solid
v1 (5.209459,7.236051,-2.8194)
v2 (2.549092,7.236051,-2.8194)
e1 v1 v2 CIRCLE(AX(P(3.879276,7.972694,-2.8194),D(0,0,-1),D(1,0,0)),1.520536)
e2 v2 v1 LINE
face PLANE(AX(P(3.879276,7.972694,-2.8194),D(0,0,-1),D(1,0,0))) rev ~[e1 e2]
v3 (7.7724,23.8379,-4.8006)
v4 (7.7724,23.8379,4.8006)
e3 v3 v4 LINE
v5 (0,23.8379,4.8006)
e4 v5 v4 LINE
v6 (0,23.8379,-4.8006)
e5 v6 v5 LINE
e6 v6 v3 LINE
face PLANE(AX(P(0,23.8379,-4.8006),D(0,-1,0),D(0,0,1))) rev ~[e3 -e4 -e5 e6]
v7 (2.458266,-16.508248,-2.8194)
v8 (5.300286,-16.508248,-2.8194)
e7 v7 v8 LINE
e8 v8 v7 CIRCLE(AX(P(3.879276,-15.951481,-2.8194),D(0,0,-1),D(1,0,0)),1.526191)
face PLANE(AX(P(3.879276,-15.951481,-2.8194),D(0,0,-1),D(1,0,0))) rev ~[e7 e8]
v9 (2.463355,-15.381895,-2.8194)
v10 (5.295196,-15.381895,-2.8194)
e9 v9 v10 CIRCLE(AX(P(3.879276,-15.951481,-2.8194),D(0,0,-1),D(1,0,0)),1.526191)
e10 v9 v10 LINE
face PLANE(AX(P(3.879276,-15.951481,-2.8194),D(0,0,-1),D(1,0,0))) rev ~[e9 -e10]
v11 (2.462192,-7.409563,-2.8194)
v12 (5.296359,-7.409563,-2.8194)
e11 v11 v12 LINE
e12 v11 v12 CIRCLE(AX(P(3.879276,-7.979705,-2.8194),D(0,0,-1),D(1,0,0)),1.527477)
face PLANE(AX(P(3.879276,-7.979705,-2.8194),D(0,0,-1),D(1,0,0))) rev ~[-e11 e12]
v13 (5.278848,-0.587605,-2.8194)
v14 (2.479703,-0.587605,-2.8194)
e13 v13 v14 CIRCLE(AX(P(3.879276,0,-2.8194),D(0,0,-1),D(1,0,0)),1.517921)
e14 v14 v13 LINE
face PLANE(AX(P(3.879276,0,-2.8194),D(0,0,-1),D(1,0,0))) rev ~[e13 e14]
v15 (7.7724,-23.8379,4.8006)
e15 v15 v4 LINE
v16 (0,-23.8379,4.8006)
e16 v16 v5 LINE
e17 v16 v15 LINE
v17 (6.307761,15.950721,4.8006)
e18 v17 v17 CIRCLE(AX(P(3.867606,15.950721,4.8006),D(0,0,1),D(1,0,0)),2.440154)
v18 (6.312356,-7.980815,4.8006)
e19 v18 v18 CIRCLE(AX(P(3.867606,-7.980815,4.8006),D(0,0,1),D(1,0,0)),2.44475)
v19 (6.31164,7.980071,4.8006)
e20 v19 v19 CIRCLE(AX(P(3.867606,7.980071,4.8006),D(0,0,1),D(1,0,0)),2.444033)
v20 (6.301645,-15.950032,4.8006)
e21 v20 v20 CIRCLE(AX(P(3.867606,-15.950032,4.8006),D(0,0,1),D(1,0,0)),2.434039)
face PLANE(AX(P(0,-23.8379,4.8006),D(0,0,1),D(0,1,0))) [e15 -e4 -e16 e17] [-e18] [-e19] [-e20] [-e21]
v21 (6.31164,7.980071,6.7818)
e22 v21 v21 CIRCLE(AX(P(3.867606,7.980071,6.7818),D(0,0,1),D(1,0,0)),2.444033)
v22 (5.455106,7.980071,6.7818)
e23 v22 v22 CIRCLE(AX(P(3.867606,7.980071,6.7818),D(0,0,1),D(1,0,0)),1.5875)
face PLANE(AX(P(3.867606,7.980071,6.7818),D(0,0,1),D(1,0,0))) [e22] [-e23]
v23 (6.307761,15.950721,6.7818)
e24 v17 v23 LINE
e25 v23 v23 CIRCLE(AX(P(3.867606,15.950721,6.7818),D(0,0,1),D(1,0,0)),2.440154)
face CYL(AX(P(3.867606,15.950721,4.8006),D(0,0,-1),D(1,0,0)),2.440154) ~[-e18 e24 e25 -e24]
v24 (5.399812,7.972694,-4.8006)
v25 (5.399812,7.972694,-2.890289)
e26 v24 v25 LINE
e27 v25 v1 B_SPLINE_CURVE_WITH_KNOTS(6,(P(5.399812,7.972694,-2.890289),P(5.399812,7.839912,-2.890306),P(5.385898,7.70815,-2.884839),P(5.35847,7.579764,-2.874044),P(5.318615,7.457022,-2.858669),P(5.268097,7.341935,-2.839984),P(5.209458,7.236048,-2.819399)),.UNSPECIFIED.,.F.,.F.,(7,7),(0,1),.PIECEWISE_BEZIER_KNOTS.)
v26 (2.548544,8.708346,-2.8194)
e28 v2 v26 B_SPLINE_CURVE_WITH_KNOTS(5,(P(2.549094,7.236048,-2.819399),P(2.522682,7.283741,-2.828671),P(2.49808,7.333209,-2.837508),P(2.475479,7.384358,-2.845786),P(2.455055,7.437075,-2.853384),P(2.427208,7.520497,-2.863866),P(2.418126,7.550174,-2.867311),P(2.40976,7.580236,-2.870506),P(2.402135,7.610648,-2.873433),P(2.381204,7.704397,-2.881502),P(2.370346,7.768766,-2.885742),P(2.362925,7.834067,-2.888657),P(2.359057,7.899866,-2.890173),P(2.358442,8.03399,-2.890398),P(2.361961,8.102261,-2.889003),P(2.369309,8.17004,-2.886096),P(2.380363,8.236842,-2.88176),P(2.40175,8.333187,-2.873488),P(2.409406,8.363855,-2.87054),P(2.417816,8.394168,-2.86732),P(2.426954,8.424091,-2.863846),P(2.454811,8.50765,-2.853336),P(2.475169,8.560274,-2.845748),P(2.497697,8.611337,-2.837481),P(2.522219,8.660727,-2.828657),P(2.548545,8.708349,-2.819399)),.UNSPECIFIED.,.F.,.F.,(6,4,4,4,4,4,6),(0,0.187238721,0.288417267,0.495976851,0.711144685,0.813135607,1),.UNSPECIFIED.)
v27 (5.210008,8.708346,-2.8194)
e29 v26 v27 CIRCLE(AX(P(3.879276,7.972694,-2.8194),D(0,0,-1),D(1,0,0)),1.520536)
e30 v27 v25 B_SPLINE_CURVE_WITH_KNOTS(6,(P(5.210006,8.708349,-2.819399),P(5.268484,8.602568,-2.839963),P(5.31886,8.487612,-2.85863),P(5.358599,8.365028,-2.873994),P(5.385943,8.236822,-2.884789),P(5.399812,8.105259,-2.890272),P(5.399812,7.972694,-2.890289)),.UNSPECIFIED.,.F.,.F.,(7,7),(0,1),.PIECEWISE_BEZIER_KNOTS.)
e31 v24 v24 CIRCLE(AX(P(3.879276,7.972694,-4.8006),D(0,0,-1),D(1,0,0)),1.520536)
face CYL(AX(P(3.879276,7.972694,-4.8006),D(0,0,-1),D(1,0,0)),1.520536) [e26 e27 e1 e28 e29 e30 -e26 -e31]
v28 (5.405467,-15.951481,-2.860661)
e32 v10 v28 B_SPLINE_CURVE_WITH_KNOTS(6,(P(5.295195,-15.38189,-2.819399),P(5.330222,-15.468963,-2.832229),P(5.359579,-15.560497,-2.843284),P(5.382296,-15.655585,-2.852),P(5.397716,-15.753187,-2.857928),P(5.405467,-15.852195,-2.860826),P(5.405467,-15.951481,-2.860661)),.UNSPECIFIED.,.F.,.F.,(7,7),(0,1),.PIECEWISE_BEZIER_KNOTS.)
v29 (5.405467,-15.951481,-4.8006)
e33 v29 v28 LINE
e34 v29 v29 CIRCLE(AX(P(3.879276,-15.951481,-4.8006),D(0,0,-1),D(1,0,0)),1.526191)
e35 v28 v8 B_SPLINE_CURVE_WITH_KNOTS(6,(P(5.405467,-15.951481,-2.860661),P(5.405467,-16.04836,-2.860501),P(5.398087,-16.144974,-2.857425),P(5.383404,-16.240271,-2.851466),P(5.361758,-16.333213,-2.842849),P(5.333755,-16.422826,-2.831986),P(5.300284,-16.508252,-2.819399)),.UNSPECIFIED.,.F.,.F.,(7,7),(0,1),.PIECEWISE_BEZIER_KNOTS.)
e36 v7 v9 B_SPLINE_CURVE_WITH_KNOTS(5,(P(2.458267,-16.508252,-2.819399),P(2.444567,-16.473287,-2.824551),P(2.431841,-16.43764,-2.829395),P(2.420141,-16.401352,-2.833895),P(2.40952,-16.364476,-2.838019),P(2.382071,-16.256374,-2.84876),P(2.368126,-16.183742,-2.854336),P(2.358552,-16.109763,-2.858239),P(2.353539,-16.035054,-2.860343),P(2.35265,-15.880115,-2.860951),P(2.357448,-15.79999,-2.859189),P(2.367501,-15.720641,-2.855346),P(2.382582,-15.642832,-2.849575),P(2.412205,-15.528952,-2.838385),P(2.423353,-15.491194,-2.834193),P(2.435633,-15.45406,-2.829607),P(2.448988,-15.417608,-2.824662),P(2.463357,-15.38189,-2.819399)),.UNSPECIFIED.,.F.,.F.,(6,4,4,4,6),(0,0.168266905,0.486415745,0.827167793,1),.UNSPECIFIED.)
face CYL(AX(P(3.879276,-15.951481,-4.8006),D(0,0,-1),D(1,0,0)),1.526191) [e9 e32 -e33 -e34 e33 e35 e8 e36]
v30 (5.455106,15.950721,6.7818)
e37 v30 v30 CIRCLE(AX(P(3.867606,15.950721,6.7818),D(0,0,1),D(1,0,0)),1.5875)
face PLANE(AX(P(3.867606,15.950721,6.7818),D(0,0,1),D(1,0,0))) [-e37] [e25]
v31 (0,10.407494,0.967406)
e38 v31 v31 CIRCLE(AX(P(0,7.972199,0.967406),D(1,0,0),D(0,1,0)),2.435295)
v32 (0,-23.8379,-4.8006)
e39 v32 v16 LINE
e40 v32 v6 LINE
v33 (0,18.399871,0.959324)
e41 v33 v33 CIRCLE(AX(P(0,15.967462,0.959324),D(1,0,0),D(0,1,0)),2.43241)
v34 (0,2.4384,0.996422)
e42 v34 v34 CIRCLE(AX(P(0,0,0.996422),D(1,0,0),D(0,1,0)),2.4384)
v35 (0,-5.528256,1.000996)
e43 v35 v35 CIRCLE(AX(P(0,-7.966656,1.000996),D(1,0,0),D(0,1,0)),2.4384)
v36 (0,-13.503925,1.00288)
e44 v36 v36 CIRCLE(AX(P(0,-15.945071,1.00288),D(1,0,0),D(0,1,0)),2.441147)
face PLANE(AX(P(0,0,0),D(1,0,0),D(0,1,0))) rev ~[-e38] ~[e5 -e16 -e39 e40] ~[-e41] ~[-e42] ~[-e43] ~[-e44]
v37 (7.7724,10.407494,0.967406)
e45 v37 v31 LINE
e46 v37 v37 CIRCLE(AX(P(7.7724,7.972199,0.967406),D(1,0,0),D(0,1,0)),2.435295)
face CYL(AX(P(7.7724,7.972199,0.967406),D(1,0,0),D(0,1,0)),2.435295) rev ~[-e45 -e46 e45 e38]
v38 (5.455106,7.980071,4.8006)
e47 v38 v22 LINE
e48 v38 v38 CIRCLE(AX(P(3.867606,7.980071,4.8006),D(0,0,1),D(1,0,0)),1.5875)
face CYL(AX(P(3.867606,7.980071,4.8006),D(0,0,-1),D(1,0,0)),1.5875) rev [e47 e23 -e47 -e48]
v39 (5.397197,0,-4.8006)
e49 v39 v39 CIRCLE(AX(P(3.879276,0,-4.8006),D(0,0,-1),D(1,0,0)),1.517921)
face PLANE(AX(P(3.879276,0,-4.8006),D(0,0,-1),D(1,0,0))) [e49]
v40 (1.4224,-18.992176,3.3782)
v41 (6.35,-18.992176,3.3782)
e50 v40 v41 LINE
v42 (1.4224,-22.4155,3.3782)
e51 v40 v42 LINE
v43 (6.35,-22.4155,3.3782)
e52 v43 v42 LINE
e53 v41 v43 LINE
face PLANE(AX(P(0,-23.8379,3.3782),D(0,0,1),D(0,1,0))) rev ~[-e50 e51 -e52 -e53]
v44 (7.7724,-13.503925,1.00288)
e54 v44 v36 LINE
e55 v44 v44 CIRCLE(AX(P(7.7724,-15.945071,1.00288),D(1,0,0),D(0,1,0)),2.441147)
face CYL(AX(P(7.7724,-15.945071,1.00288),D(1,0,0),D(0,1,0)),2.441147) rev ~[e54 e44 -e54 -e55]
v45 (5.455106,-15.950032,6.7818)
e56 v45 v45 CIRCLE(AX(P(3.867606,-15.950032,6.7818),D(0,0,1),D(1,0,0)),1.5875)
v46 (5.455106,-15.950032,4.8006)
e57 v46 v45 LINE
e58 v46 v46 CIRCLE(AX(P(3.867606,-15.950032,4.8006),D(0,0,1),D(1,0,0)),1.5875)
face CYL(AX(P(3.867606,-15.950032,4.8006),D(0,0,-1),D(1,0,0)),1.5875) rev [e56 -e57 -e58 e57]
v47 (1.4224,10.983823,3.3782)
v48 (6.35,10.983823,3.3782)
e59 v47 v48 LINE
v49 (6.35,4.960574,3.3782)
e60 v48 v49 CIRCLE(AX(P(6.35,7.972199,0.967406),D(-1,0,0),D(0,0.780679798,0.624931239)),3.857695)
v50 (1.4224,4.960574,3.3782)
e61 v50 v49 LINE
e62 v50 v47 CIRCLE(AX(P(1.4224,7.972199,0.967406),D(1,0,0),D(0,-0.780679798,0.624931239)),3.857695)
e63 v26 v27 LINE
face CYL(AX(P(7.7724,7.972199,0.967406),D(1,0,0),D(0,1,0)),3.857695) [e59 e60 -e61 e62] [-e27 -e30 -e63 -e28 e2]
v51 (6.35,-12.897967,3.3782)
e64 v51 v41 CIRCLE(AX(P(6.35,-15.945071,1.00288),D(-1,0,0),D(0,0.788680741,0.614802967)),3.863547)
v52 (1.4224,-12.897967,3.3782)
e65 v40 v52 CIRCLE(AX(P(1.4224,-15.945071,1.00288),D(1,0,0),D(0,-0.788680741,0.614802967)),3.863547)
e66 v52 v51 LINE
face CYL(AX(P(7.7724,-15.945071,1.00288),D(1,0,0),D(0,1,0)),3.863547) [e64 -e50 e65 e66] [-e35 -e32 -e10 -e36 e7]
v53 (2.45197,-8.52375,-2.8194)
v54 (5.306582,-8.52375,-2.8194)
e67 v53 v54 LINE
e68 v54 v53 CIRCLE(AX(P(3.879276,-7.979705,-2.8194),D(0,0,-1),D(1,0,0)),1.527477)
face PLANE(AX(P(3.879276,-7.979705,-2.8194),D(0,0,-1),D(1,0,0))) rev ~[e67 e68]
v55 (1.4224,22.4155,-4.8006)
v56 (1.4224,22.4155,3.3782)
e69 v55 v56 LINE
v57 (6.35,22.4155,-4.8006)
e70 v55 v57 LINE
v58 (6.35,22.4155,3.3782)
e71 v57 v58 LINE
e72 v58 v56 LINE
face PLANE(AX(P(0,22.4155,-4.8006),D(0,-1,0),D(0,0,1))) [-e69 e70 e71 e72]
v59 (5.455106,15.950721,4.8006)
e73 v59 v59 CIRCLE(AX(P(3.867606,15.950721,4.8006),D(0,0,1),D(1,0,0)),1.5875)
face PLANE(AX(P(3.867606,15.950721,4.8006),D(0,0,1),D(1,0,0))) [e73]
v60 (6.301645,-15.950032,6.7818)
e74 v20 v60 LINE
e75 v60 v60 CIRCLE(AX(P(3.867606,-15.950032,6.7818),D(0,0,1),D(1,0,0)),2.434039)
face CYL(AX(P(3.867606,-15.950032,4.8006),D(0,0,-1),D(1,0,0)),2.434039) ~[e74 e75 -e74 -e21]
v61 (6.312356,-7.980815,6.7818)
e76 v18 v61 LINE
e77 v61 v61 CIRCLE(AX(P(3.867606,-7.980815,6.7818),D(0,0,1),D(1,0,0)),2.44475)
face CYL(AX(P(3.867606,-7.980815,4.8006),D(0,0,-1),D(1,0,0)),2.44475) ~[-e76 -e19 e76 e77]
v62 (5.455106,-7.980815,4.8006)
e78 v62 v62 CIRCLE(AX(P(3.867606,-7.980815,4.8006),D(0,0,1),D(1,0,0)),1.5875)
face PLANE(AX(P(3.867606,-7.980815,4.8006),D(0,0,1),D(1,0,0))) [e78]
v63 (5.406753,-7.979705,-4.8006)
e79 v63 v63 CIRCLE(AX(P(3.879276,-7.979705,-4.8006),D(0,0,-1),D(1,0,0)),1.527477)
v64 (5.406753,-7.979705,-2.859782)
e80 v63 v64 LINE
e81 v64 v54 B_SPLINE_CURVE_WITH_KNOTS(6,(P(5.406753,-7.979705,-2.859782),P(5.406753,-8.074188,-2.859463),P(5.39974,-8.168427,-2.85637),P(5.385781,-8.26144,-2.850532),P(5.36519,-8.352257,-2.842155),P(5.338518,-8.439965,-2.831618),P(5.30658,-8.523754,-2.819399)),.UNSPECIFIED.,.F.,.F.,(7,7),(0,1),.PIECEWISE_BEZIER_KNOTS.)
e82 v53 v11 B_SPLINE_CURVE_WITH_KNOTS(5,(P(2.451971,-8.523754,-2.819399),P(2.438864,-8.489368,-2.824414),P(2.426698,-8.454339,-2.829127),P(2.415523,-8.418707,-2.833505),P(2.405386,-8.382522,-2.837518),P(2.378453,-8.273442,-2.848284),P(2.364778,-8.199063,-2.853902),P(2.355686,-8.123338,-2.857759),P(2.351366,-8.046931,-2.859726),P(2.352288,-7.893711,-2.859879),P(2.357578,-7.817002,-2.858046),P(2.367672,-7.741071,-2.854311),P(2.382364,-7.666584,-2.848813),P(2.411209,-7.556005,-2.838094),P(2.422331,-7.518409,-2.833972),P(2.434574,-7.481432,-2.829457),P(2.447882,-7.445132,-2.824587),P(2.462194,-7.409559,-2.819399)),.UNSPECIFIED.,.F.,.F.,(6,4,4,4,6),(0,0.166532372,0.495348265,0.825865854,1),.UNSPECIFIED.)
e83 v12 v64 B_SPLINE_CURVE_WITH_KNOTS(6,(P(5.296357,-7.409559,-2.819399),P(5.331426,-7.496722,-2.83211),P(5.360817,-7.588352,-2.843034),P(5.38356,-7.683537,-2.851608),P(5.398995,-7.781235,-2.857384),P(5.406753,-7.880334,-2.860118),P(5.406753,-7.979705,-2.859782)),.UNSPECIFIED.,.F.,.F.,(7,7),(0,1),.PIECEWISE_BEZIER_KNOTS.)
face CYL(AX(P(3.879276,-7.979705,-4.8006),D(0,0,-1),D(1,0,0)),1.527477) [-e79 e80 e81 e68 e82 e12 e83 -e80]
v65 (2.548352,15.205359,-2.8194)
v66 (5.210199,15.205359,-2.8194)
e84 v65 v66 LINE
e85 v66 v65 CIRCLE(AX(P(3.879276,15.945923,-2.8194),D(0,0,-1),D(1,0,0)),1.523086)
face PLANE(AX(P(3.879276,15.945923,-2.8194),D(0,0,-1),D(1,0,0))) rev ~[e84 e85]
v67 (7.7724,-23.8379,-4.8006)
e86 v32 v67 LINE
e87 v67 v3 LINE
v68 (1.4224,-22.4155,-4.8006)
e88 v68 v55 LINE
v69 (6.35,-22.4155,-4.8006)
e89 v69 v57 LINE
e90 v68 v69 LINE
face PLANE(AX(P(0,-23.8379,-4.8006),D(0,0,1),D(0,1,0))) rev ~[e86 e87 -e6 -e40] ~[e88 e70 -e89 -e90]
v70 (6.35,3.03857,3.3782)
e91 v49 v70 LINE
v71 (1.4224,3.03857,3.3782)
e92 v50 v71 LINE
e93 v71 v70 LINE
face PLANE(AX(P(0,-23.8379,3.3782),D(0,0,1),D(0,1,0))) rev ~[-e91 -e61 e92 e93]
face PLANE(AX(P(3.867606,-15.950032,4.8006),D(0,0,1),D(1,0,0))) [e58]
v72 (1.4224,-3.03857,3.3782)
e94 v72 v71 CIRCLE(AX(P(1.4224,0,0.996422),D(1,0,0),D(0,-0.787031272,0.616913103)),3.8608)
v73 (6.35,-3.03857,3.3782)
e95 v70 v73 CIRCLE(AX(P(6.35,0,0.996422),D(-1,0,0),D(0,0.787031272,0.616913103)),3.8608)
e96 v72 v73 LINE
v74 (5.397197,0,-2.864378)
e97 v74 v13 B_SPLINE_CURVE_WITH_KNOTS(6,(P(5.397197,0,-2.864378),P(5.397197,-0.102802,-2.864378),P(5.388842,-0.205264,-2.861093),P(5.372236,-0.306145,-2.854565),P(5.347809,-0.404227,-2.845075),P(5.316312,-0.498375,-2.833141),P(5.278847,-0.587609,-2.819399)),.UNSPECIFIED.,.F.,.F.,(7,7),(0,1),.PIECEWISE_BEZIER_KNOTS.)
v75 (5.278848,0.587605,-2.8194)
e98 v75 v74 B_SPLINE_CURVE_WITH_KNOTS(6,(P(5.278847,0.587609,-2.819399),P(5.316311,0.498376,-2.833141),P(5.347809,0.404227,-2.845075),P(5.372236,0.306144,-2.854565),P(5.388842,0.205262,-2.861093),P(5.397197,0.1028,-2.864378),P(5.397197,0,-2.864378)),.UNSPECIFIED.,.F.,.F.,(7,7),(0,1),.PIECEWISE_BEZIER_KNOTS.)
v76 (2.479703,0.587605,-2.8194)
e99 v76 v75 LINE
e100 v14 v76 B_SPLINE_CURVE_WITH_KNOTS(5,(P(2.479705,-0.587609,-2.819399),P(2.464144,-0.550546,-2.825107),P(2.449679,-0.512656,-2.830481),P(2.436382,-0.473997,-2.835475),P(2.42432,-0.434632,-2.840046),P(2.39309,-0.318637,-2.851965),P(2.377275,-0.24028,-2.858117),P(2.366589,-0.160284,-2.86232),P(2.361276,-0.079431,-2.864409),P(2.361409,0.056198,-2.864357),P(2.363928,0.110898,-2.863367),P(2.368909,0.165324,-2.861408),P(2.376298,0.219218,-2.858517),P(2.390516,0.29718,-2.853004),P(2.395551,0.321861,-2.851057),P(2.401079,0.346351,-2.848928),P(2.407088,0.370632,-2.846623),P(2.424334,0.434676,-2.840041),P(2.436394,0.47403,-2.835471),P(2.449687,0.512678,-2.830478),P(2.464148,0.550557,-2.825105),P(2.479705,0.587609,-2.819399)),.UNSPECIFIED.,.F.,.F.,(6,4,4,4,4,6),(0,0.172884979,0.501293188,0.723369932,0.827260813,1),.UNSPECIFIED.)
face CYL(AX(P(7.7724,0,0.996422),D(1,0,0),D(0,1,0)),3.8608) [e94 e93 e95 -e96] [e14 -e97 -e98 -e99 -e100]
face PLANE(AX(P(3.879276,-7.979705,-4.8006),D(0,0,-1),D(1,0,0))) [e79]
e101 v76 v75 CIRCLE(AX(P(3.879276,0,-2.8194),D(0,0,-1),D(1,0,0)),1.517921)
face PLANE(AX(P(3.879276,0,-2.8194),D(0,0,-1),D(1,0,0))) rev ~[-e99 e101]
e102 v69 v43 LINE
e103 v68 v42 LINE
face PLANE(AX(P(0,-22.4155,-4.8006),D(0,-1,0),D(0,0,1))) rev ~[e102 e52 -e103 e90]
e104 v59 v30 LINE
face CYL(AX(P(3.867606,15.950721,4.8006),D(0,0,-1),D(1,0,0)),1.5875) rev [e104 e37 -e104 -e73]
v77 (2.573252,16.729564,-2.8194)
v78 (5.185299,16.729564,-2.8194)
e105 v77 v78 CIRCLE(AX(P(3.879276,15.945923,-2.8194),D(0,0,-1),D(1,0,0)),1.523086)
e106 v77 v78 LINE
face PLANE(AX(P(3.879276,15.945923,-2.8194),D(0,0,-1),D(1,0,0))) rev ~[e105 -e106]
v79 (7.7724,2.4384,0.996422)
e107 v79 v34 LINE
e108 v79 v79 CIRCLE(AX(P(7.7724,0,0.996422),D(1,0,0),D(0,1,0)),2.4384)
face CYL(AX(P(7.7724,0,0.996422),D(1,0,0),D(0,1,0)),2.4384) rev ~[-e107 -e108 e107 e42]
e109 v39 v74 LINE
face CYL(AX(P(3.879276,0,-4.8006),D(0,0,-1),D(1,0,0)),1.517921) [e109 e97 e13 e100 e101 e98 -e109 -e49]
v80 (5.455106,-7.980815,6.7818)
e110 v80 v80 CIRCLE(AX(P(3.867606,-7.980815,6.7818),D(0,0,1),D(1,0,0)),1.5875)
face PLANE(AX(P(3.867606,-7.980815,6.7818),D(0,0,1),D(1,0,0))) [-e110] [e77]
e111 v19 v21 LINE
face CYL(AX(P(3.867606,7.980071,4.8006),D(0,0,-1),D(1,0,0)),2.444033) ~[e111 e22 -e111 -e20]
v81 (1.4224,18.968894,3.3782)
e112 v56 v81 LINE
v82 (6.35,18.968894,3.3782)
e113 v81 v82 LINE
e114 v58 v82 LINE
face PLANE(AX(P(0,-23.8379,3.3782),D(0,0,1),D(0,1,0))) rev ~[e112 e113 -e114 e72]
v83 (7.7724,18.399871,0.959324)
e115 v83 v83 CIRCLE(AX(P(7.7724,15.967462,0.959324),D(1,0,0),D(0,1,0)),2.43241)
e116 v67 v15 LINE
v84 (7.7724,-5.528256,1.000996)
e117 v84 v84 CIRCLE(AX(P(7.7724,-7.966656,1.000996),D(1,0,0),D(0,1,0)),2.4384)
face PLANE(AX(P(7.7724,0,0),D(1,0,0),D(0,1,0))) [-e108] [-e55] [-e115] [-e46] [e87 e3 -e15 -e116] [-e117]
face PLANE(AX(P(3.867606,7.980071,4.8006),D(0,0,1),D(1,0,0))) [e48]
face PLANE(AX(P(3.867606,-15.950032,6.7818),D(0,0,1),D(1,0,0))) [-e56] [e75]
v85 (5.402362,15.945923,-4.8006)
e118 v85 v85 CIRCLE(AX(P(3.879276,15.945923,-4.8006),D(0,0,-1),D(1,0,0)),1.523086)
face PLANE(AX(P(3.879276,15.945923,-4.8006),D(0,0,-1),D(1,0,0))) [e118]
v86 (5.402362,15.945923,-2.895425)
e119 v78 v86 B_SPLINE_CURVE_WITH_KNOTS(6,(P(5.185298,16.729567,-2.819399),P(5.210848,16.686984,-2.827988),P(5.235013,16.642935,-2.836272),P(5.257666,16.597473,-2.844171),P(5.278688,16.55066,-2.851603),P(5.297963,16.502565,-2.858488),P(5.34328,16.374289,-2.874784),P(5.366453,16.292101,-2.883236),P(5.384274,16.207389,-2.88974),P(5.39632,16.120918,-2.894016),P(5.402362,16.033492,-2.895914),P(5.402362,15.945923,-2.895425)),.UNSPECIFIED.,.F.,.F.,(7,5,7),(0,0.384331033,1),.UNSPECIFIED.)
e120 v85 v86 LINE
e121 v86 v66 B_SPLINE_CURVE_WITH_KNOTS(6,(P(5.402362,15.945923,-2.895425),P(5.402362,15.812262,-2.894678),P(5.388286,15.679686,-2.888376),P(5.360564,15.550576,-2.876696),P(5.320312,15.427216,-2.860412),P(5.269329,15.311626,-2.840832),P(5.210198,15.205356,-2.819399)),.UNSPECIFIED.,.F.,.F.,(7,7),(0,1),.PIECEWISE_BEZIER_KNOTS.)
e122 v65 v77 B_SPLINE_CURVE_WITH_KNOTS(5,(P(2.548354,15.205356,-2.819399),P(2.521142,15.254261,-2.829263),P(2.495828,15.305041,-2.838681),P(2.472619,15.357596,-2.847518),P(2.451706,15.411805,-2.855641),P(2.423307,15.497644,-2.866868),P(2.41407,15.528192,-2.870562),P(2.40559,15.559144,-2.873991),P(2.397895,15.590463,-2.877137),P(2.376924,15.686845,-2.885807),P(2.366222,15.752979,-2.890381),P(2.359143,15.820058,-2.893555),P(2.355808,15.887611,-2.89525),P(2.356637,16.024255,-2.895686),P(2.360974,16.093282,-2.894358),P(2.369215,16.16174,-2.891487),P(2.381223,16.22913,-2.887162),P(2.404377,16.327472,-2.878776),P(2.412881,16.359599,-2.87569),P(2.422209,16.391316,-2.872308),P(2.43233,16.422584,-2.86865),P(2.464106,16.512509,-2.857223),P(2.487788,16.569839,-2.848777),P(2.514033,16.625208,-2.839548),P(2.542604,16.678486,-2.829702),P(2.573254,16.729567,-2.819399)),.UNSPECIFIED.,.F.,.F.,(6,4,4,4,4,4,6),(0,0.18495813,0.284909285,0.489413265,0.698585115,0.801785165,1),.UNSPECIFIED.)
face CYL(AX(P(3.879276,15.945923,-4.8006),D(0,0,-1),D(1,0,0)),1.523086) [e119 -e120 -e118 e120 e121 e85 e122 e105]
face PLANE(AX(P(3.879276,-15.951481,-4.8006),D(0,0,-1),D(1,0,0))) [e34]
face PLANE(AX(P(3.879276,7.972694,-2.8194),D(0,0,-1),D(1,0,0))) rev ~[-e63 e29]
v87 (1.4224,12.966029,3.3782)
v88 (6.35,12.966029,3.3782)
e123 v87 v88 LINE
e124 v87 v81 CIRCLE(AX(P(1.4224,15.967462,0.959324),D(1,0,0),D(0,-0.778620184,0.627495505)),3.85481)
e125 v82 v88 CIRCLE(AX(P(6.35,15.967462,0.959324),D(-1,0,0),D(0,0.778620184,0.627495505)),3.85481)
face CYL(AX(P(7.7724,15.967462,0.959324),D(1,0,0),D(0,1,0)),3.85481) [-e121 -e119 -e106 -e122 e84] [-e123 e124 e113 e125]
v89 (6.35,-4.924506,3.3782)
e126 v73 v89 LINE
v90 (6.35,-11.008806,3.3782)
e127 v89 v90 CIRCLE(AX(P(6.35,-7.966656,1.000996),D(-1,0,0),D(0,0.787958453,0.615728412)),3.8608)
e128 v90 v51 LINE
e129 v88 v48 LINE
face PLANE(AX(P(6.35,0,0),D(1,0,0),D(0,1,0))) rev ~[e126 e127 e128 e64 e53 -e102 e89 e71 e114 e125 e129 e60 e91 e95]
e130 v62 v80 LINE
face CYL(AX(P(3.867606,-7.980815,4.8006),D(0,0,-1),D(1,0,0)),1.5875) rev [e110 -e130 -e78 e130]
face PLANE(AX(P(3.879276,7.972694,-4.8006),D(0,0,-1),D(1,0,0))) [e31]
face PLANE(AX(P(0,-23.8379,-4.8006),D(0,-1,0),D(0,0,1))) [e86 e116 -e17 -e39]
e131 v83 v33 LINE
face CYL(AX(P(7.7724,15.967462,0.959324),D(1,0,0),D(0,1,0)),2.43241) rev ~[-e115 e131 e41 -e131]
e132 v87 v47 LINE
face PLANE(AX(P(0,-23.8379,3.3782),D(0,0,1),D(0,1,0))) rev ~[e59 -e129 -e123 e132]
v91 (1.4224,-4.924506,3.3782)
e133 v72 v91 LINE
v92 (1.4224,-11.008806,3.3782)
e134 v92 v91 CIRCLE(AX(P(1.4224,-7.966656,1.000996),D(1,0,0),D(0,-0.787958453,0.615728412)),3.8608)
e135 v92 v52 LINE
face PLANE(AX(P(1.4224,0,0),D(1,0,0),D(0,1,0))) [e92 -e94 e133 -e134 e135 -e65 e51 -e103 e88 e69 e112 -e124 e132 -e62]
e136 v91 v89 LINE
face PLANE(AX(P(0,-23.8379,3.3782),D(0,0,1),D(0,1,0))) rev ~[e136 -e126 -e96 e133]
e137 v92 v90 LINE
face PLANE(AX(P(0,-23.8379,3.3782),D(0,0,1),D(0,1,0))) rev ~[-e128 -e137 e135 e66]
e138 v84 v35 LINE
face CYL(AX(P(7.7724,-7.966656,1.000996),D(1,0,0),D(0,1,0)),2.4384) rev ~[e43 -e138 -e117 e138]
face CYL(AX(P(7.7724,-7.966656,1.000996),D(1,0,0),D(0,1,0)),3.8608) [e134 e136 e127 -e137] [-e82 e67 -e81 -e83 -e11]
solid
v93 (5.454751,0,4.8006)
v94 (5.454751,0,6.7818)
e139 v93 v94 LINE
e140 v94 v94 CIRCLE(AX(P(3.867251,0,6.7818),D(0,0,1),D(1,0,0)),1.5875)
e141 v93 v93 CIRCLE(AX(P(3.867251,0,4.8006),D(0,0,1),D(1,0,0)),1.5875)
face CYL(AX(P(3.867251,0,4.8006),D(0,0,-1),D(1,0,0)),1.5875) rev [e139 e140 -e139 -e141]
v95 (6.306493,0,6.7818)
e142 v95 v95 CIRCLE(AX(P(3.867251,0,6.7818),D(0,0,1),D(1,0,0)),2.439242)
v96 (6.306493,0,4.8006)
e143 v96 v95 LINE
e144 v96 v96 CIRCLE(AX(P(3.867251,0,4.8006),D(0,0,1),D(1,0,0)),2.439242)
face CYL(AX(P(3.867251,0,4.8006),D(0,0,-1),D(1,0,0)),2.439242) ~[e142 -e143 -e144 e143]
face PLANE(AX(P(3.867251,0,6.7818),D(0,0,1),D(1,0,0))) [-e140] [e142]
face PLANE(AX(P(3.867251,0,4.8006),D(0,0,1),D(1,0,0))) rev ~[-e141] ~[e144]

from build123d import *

# Parameters (mm, degrees)
F0_W      = 47.6758
F0_H      = 9.6012
F1_DEPTH  = 7.7724
F2_R      = 2.4384
F7_DEPTH  = 7.7724
F3_R      = 2.4352950492
F4_R      = 2.4324096057
F5_R      = 2.4384
F6_R      = 2.4411466666
F8_DEPTH  = 7.7724
F9_R      = 2.4401544128
F9_R_2    = 2.4440333998
F9_R_3    = 2.4447496076
F9_R_4    = 2.4340385208
F10_DEPTH = 1.9812
F11_R     = 2.4392424312
F12_DEPTH = 1.9812
F13_R     = 1.5875
F14_DEPTH = 1.9812
F15_T     = 1.4224
F16_R     = 1.5230861876
F16_R_2   = 1.5205363596
F16_R_3   = 1.5179209079
F16_R_4   = 1.5274772516
F16_R_5   = 1.526191219
F17_DEPTH = 1.9812


# Not quite as in the source:
# - a shell that OpenCascade refuses in one call is made with other operations: the cavity is built on its own and cut out


with BuildPart() as f1:
    # F0 (on Right) → F1 (new body)
    with BuildSketch(Plane.YZ):
        Rectangle(F0_W, F0_H)
    extrude(amount=F1_DEPTH)

    # F2 (on face) → F7 (cut, through all)
    with BuildSketch(Plane.YZ.offset(7.7724)):
        with Locations((0, 0.9964218903)):
            Circle(F2_R)
    extrude(amount=-F7_DEPTH, mode=Mode.SUBTRACT)

    # F3 (on face) + F4 (on face) + F5 (on face) + F6 (on face) → F8 (cut, through all)
    with BuildSketch(Plane.YZ.offset(7.7724)):
        with Locations((7.9721985385, 0.9674058529)):
            Circle(F3_R)
    with BuildSketch(Plane.YZ.offset(7.7724)):
        with Locations((15.967461552, 0.9593243012)):
            Circle(F4_R)
    with BuildSketch(Plane.YZ.offset(7.7724)):
        with Locations((-7.9666562378, 1.0009957477)):
            Circle(F5_R)
    with BuildSketch(Plane.YZ.offset(7.7724)):
        with Locations((-15.9450713545, 1.0028800461)):
            Circle(F6_R)
    extrude(amount=-F8_DEPTH, mode=Mode.SUBTRACT)

    # F9 (on face) → F10 (join)
    with BuildSketch(Plane.XY.offset(4.8006)):
        with Locations((3.8676063996, 15.9507207572)):
            Circle(F9_R)
        with Locations((3.8676063996, 7.9800710082)):
            Circle(F9_R_2)
        with Locations((3.8676063996, -7.9808151349)):
            Circle(F9_R_3)
        with Locations((3.8676063996, -15.9500315785)):
            Circle(F9_R_4)
    extrude(amount=F10_DEPTH)


with BuildPart() as f12:
    # F11 (on face) → F12 (new body)
    with BuildSketch(Plane.XY.offset(4.8006)):
        with Locations((3.8672508672, 0)):
            Circle(F11_R)
    extrude(amount=F12_DEPTH)


with BuildPart() as f14_tool:
    # F13 (on face) → F14 (new body, through all)
    with BuildSketch(Plane.XY.offset(4.8006)):
        with Locations((3.8676063996, -15.9500315785)):
            Circle(F13_R)
        with Locations((3.8676063996, -7.9808151349)):
            Circle(F13_R)
        with Locations((3.8672508672, 0)):
            Circle(F13_R)
        with Locations((3.8676063996, 7.9800710082)):
            Circle(F13_R)
        with Locations((3.8676063996, 15.9507207572)):
            Circle(F13_R)
    extrude(amount=F14_DEPTH)


with BuildPart() as f1_1:
    add(f1.part)

    # F14: cut by f14_tool
    add(f14_tool.part, mode=Mode.SUBTRACT)

    # F15: shell of thickness 1.4224, made by hand


with BuildPart() as f12_1:
    add(f12.part)

    # F14: cut by f14_tool
    add(f14_tool.part, mode=Mode.SUBTRACT)


with BuildPart() as f15_core1:
    # F15_t2: copy of F1
    add(f1_1.part)

    # the walls: a layer under each face that stays
    f15_faces = [f15_core1.faces().sort_by_distance(p)[0] for p in [
        (3.8862, -23.8379, 0),
        (3.8862, 23.8379, 0),
        (0, -15.8919333333, -3.2004),
        (7.7724, -15.8919333333, -3.2004),
        (3.8862, 0, 4.8006),
        (3.8862, 5.5369034893, 0.9674058529),
        (3.8862, 13.5350519463, 0.9593243012),
        (3.8862, -18.3862180211, 1.0028800461),
        (3.8862, -10.4050562378, 1.0009957477),
        (3.8862, -2.4384, 0.9964218903),
        (1.4274519868, 15.9507207572, 5.7912),
        (1.4235729997, 7.9800710082, 5.7912),
        (1.422856792, -7.9808151349, 5.7912),
        (1.4335678788, -15.9500315785, 5.7912),
        (2.2408367911, 14.3239511487, 6.7818),
        (2.2382507997, 6.3507154083, 6.7818),
        (2.2377733279, -9.6106482067, 6.7818),
        (2.2449140524, -17.5727239257, 6.7818),
        (2.2801063996, 15.9507207572, 5.7912),
        (2.2801063996, 7.9800710082, 5.7912),
        (2.2801063996, -7.9808151349, 5.7912),
        (2.2801063996, -15.9500315785, 5.7912),
        (3.8676063996, 15.9507207572, 4.8006),
        (3.8676063996, 7.9800710082, 4.8006),
        (3.8676063996, -7.9808151349, 4.8006),
        (3.8676063996, -15.9500315785, 4.8006),
    ]]
    thicken(f15_faces, amount=-F15_T, mode=Mode.SUBTRACT)

    # F15_s3 → F15_t4 (revolve, cut)
    with BuildSketch(Plane.XZ.offset(-15.9507207572)):
        Polygon((6.3219848124, 4.814824), (6.3077608124, 3.3782), (4.8853608124, 3.3782), (4.8853608124, 4.8006), align=None)
    revolve(axis=Axis((3.8676063996, 15.9507207572, 4.8006), (0, 0, 1)), mode=Mode.SUBTRACT)

    # F15_s5 → F15_t6 (revolve, cut)
    with BuildSketch(Plane.XZ.offset(-7.9800710082)):
        Polygon((6.3258637994, 4.814824), (6.3116397994, 3.3782), (4.8892397994, 3.3782), (4.8892397994, 4.8006), align=None)
    revolve(axis=Axis((3.8676063996, 7.9800710082, 4.8006), (0, 0, 1)), mode=Mode.SUBTRACT)

    # F15_s7 → F15_t8 (revolve, cut)
    with BuildSketch(Plane.XZ.offset(7.9808151349)):
        Polygon((6.3265800072, 4.814824), (6.3123560072, 3.3782), (4.8899560072, 3.3782), (4.8899560072, 4.8006), align=None)
    revolve(axis=Axis((3.8676063996, -7.9808151349, 4.8006), (0, 0, 1)), mode=Mode.SUBTRACT)

    # F15_s9 → F15_t10 (revolve, cut)
    with BuildSketch(Plane.XZ.offset(15.9500315785)):
        Polygon((6.3158689203, 4.814824), (6.3016449203, 3.3782), (4.8792449203, 3.3782), (4.8792449203, 4.8006), align=None)
    revolve(axis=Axis((3.8676063996, -15.9500315785, 4.8006), (0, 0, 1)), mode=Mode.SUBTRACT)

    # F15_s11 → F15_t12 (revolve, cut)
    with BuildSketch(Plane.XZ.offset(-15.9507207572)):
        Polygon((5.4408823996, 4.814824), (6.8775063996, 4.8006), (6.8775063996, 3.3782), (5.4551063996, 3.3782), align=None)
    revolve(axis=Axis((3.8676063996, 15.9507207572, 4.8006), (0, 0, 1)), mode=Mode.SUBTRACT)

    # F15_s13 → F15_t14 (revolve, cut)
    with BuildSketch(Plane.XZ.offset(-7.9800710082)):
        Polygon((5.4408823996, 4.814824), (6.8775063996, 4.8006), (6.8775063996, 3.3782), (5.4551063996, 3.3782), align=None)
    revolve(axis=Axis((3.8676063996, 7.9800710082, 4.8006), (0, 0, 1)), mode=Mode.SUBTRACT)

    # F15_s15 → F15_t16 (revolve, cut)
    with BuildSketch(Plane.XZ.offset(7.9808151349)):
        Polygon((5.4408823996, 4.814824), (6.8775063996, 4.8006), (6.8775063996, 3.3782), (5.4551063996, 3.3782), align=None)
    revolve(axis=Axis((3.8676063996, -7.9808151349, 4.8006), (0, 0, 1)), mode=Mode.SUBTRACT)

    # F15_s17 → F15_t18 (revolve, cut)
    with BuildSketch(Plane.XZ.offset(15.9500315785)):
        Polygon((5.4408823996, 4.814824), (6.8775063996, 4.8006), (6.8775063996, 3.3782), (5.4551063996, 3.3782), align=None)
    revolve(axis=Axis((3.8676063996, -15.9500315785, 4.8006), (0, 0, 1)), mode=Mode.SUBTRACT)


with BuildPart() as f1_2:
    add(f1_1.part)

    # what is left inside the walls is the cavity
    f15_cavity = [f15_core1.part.solids().sort_by_distance(p)[0] for p in [
        (4.707467, 0, -4.786376),
    ]]
    add(f15_cavity, mode=Mode.SUBTRACT)

    # F16 (on face) → F17 (join)
    with BuildSketch(Plane(origin=(0, 0, -4.8006), x_dir=(1, 0, 0), z_dir=(0, 0, -1))):
        with Locations((3.8792756386, -15.9459225833)):
            Circle(F16_R)
        with Locations((3.8792756386, -7.9726940021)):
            Circle(F16_R_2)
        with Locations((3.8792756386, 0)):
            Circle(F16_R_3)
        with Locations((3.8792756386, 7.9797049984)):
            Circle(F16_R_4)
        with Locations((3.8792756386, 15.9514807165)):
            Circle(F16_R_5)
    extrude(amount=-F17_DEPTH)


solid = Compound([f12_1.part, f1_2.part])
